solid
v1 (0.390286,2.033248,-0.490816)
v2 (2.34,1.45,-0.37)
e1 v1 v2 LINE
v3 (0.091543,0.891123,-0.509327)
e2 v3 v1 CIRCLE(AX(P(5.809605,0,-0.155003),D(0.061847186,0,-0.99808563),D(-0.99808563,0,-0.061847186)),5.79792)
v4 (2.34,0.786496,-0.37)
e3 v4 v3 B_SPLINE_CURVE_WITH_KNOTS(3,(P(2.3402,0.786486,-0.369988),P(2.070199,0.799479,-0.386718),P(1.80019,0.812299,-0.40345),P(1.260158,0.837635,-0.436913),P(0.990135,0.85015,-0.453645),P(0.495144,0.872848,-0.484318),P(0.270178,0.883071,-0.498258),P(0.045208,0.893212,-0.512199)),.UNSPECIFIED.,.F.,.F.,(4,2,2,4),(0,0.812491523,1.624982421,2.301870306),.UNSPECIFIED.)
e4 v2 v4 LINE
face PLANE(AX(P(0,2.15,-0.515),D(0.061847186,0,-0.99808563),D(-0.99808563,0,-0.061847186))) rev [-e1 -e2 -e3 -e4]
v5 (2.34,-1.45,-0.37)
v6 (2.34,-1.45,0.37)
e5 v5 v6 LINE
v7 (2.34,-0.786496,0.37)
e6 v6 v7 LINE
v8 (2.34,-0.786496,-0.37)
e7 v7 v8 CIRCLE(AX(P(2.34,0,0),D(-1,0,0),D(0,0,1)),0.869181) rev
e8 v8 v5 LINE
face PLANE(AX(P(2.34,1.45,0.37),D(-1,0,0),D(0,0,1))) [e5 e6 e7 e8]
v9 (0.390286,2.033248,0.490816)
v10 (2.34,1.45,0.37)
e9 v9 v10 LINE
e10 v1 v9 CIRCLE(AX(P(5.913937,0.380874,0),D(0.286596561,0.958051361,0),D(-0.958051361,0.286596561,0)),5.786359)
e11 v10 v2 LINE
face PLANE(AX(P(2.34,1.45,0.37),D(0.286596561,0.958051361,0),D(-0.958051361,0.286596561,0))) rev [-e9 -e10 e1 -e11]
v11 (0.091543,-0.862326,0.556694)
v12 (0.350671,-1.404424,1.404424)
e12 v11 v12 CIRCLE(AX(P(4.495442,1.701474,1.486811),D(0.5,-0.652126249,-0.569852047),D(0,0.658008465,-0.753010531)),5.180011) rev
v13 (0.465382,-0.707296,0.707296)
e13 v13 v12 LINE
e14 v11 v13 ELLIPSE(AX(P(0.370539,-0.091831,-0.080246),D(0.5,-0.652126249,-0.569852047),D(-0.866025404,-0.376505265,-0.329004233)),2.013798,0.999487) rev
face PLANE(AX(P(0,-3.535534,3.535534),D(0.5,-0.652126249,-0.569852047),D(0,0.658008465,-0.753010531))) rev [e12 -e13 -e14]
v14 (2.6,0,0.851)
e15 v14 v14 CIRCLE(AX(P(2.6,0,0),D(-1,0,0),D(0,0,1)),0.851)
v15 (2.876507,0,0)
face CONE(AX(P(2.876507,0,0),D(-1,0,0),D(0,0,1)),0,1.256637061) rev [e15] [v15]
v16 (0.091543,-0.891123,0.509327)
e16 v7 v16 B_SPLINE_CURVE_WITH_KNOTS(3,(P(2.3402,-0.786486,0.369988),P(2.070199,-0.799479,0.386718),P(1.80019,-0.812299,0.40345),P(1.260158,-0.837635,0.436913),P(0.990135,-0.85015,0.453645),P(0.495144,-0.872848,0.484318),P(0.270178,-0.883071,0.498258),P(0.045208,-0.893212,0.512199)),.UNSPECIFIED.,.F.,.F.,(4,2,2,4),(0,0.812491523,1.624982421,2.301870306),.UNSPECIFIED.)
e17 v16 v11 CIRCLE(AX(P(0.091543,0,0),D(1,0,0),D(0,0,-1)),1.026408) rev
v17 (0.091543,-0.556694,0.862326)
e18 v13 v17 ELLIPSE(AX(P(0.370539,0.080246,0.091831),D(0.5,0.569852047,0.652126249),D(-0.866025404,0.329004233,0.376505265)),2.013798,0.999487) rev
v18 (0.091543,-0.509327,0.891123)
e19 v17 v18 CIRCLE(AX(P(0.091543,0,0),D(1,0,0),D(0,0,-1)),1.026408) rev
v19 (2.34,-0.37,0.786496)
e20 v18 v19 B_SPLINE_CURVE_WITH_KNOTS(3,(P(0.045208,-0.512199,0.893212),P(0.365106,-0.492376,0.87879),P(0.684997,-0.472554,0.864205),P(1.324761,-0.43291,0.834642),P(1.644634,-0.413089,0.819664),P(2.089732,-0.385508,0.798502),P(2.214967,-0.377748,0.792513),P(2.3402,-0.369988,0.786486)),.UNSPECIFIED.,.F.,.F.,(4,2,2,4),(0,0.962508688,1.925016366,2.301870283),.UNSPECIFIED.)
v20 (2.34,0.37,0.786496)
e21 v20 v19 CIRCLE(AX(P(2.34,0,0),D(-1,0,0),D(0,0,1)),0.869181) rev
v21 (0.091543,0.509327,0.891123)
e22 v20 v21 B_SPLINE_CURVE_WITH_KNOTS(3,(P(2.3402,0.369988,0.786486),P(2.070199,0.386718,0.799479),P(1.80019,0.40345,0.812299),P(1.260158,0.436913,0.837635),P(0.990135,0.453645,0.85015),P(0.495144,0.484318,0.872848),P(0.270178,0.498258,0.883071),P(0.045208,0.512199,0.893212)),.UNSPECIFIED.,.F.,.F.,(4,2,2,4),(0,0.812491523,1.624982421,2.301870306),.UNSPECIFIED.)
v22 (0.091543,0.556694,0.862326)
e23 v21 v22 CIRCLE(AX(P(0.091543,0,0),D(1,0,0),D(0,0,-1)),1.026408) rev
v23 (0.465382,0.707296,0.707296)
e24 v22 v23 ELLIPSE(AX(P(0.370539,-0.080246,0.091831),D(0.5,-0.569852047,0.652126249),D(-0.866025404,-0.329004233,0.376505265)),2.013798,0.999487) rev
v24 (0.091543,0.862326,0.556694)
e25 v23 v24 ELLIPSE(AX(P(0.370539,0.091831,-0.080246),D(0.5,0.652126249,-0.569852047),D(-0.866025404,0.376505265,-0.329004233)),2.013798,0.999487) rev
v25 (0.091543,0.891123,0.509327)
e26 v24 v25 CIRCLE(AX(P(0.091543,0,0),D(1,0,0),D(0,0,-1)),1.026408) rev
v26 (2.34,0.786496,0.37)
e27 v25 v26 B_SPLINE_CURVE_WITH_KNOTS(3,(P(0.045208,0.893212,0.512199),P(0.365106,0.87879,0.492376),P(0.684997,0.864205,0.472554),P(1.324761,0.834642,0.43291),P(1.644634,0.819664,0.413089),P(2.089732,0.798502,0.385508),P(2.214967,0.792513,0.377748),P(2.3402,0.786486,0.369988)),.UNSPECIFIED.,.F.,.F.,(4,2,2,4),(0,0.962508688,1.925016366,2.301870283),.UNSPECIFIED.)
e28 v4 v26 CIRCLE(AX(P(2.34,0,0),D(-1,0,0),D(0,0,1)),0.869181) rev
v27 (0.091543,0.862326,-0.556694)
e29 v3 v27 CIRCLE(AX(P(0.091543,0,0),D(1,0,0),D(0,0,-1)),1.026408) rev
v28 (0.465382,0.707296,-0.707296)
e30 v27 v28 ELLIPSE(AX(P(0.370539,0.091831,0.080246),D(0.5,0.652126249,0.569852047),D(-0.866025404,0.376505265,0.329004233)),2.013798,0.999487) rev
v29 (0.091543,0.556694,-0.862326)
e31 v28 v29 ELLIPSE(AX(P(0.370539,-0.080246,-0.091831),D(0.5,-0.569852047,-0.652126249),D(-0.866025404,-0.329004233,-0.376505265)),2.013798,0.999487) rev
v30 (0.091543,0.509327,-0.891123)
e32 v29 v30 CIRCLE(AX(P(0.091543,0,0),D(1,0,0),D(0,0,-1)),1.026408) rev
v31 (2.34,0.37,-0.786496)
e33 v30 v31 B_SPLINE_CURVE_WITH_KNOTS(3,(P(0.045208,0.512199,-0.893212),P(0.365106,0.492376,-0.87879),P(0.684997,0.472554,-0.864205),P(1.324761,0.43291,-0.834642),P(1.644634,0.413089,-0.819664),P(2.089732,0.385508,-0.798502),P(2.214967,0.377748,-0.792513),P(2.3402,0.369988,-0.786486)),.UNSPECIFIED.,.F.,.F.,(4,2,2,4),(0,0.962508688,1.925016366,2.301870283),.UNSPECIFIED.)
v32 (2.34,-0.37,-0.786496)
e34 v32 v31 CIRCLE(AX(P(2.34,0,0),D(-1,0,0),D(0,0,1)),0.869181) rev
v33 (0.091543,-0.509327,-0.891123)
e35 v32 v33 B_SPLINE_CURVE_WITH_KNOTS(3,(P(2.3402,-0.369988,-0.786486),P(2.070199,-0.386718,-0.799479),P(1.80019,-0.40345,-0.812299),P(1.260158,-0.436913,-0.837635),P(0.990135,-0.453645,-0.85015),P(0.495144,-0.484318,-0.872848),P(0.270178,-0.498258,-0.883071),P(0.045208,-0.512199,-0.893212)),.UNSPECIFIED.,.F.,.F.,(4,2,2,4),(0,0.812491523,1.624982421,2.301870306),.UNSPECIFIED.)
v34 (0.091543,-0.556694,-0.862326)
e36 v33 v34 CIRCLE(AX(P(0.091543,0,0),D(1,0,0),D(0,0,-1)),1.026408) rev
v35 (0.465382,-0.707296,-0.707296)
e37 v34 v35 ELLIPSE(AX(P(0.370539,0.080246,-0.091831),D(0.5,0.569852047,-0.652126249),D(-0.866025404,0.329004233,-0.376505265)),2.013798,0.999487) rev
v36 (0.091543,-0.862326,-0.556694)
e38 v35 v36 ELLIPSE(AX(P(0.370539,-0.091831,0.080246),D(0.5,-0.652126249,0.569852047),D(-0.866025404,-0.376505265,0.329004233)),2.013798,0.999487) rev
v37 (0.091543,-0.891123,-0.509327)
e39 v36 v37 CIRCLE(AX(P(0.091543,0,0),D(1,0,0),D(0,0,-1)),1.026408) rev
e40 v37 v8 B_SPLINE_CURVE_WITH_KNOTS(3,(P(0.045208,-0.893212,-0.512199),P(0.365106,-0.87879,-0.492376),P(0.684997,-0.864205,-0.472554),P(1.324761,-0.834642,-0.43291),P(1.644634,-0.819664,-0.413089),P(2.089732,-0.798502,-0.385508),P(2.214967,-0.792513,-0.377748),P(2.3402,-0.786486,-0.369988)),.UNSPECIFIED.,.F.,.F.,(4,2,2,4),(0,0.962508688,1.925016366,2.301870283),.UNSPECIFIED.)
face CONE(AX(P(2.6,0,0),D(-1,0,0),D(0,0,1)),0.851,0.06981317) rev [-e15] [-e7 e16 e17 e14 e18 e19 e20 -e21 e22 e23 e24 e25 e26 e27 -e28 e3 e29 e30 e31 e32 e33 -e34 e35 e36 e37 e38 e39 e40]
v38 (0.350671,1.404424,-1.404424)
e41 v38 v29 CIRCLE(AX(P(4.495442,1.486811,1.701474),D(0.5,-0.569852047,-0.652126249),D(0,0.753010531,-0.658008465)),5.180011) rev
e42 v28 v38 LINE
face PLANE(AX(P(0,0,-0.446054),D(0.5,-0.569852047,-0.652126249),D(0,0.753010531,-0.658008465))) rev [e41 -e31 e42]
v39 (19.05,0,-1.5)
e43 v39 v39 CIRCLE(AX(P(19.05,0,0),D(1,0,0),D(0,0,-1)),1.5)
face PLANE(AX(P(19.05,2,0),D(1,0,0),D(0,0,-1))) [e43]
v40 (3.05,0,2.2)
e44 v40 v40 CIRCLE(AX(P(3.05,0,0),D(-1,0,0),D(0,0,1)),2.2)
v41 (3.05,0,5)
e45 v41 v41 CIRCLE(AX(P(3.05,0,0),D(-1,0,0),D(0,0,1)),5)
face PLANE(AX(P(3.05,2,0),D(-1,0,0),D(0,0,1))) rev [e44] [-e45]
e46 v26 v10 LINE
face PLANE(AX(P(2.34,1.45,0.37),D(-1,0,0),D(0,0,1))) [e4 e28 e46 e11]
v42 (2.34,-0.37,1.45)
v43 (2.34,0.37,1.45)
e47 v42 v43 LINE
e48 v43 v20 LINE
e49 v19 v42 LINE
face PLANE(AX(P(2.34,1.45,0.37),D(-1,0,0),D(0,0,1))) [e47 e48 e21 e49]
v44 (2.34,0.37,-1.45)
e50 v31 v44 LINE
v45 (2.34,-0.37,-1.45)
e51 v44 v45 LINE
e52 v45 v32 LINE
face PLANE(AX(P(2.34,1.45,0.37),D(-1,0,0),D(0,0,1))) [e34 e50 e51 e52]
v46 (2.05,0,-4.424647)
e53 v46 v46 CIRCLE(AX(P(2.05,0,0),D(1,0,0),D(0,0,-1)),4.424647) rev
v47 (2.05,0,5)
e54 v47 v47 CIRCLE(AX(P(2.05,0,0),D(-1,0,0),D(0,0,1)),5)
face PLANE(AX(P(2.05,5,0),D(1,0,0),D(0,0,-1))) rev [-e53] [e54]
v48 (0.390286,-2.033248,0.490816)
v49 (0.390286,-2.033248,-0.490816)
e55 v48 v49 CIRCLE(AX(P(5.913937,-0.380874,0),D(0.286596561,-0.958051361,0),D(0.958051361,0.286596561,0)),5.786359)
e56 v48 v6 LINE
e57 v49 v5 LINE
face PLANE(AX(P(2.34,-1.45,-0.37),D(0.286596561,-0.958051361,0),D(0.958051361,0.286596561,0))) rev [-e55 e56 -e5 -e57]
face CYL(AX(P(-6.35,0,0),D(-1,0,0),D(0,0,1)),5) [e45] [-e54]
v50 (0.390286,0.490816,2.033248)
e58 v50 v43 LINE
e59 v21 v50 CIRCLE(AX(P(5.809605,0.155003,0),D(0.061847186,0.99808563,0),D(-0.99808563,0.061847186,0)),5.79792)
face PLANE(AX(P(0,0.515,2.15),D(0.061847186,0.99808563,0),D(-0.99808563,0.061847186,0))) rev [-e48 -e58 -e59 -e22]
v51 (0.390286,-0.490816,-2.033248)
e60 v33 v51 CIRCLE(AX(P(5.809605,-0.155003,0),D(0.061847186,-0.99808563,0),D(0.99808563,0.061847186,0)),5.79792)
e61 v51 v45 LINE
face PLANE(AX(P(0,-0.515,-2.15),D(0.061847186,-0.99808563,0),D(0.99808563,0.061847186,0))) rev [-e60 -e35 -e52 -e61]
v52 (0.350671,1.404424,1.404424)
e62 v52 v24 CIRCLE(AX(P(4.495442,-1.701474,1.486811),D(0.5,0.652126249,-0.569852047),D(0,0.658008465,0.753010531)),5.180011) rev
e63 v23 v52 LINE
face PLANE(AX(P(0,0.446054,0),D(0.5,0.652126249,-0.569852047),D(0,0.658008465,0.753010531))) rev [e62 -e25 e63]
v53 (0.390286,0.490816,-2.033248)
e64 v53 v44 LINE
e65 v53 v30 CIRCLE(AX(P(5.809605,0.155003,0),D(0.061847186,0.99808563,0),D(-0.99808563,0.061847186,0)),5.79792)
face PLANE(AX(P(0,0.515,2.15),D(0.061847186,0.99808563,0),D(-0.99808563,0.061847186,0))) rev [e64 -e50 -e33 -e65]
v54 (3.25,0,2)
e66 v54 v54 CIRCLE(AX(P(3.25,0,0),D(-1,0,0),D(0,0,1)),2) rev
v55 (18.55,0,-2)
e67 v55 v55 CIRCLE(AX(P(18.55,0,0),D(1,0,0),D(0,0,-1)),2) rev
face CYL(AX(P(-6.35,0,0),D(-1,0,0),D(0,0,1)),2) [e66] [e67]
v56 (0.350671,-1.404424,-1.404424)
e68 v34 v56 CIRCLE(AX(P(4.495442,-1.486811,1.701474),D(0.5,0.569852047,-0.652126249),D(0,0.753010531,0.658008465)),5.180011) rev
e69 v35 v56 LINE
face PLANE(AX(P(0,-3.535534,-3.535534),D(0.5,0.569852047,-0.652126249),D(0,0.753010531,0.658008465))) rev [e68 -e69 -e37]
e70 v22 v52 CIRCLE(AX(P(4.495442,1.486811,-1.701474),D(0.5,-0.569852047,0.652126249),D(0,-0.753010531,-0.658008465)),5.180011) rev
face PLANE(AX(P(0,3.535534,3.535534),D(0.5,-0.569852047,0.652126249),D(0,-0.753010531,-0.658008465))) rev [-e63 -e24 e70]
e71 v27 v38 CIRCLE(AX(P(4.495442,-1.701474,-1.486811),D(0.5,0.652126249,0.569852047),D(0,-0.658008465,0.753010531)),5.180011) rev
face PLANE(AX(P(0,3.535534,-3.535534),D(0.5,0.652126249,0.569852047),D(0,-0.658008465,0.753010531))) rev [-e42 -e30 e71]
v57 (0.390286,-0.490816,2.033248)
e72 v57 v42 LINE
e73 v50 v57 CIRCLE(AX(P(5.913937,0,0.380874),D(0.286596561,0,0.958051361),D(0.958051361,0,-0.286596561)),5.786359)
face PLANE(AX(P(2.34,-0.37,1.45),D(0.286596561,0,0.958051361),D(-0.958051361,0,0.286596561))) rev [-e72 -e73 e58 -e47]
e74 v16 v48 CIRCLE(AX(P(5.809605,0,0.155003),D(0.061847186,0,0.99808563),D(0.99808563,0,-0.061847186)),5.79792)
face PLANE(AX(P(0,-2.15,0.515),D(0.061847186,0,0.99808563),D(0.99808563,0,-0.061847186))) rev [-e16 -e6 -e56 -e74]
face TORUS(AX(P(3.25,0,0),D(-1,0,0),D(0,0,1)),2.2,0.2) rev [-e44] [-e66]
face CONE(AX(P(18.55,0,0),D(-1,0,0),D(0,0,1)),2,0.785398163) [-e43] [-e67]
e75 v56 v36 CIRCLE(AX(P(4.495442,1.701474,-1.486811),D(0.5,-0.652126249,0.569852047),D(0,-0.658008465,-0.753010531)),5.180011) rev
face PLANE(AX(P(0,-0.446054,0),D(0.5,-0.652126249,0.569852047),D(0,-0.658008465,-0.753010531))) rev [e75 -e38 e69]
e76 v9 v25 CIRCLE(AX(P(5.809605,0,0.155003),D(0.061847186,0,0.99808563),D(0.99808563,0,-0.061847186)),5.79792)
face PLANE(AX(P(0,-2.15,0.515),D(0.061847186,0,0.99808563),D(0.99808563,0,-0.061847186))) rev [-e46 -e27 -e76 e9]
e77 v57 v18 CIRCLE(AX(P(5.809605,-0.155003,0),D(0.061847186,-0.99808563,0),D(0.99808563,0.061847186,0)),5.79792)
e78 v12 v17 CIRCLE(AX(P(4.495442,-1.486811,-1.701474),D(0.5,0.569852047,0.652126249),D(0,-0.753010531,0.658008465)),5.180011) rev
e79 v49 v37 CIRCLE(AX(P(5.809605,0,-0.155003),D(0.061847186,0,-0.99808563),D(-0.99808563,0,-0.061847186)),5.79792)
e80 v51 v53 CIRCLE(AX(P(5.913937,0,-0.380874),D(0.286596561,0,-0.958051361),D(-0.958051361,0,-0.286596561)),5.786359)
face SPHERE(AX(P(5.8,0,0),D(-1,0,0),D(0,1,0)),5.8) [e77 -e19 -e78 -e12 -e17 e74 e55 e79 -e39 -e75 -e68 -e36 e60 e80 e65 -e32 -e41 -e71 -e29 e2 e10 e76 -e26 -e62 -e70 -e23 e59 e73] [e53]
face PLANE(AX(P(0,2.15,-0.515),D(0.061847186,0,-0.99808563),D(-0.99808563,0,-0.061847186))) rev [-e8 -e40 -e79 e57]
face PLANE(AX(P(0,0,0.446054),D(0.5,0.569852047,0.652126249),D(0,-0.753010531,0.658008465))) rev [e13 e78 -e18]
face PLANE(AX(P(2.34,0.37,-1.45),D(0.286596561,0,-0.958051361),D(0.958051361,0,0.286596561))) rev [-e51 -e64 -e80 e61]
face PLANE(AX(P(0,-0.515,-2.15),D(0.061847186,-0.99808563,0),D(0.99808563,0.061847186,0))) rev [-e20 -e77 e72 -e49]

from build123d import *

# Parameters (mm, degrees)
FILLET1_R             = 0.2
RECPAT_COUNT          = 2
RECPAT_ANGLE          = 90
CHAMFER_1_SIZE        = 0.5
CUT_EXTRUDE_START     = -1.932317225
CUT_EXTRUDE_1_DEPTH   = 0.992538955
CUT_EXTRUDE_1_2_DEPTH = 0.992538955
CUT_EXTRUDE_1_3_DEPTH = 0.992538955
CUT_EXTRUDE_1_4_DEPTH = 0.992538955


# Read off the part's stored shape, not the designer's step: Вытянуть1
with BuildPart() as part:
    # BodySke → Base-Revolve (revolve)
    with BuildSketch(Plane.XY, mode=Mode.PRIVATE) as base_revolve_sk:
        Polygon((3.05, 2), (3.05, 5), (2.05, 5), (2.05, 0), (19.05, 0), (19.05, 2), align=None)
    revolve(base_revolve_sk.sketch.rotate(Axis((-6.35, 0, 0), (1, 0, 0)), 90), axis=Axis((-6.35, 0, 0), (1, 0, 0)))

    # Fillet1
    fillet1_edges = [part.edges().sort_by_distance(p)[0] for p in [
        (3.05, 0, -2),
    ]]
    fillet(fillet1_edges, radius=FILLET1_R)

    # PanSke → Pan (revolve)
    with BuildSketch(Plane.XY):
        with BuildLine():
            Line((2.05, 4.424646879), (2.05, 0))
            Line((2.05, 0), (0, 0))
            ThreePointArc((0, 0), (0.537396082, 2.438237068), (2.05, 4.424646879))
        make_face()
    revolve(axis=Axis((0, 0, 0), (1, 0, 0)))

    # Sketch3 → Recess section 0
    with BuildSketch(Plane(origin=(0, 0, 0), x_dir=(0, 0, -1), z_dir=(1, 0, 0))):
        with BuildLine():
            Line((-0.515, 2.15), (0.515, 2.15))
            Line((0.515, 2.15), (0.515, -2.15))
            Line((0.515, -2.15), (-0.515, -2.15))
            Line((-0.515, -2.15), (-0.515, 2.15))
        make_face()
    # Sketch4 → Recess section 1
    with BuildSketch(Plane(origin=(2.34, 0, 0), x_dir=(0, 0, -1), z_dir=(1, 0, 0))):
        with BuildLine():
            Line((-0.37, 1.45), (0.37, 1.45))
            Line((0.37, 1.45), (0.37, -1.45))
            Line((0.37, -1.45), (-0.37, -1.45))
            Line((-0.37, -1.45), (-0.37, 1.45))
        make_face()
    recess = loft(mode=Mode.SUBTRACT)

    # RecPat: Recess ×2 about axis
    recpat_axis = Axis((0, 0, 0), (1, 0, 0))
    for i in range(1, RECPAT_COUNT):
        add(recess.rotate(recpat_axis, i * RECPAT_ANGLE / (RECPAT_COUNT - 1)), mode=Mode.SUBTRACT)

    # RecCorSke → RecessCore (revolve, cut)
    with BuildSketch(Plane.XY, mode=Mode.PRIVATE) as recesscore_sk:
        Polygon((0, 0), (0, 1.032809711), (2.6, 0.851), (2.876506661, 0), align=None)
    revolve(recesscore_sk.sketch.rotate(Axis((-3.175, 0, 0), (1, 0, 0)), 90), axis=Axis((-3.175, 0, 0), (1, 0, 0)), mode=Mode.SUBTRACT)

    # Фаска1
    chamfer_1_edges = [part.edges().sort_by_distance(p)[0] for p in [
        (19.05, 0, -2),
    ]]
    chamfer(chamfer_1_edges, length=CHAMFER_1_SIZE)

    # Вытянуть1 outline → Вытянуть1 (cut)
    with BuildSketch(Plane(origin=(0, 0, 0), x_dir=(0.9932989193126689, -0.08172287590474257, -0.08172287590474261), z_dir=(0.1155735994606204, 0.7023684015912574, 0.7023684015912578)).offset(CUT_EXTRUDE_START)):
        Polygon((-1, -0.919204654), (0.206895578, -0.216114133), (0.577867997, 0), (0.206895578, 0.216114133), (-1, 0.919204654), align=None)
    extrude(amount=CUT_EXTRUDE_1_DEPTH, mode=Mode.SUBTRACT)

    # Cut-Extrude 1 2 outline → Cut-Extrude 1 2 (cut)
    with BuildSketch(Plane(origin=(0, 0, 0), x_dir=(0.9932989193126689, -0.08172287590474257, 0.08172287590474261), z_dir=(0.1155735994606204, 0.7023684015912574, -0.7023684015912578)).offset(CUT_EXTRUDE_START)):
        Polygon((0.206895578, -0.216114133), (0.577867997, 0), (0.206895578, 0.216114133), (-1, 0.919204654), (-1, -0.919204654), align=None)
    extrude(amount=CUT_EXTRUDE_1_2_DEPTH, mode=Mode.SUBTRACT)

    # Cut-Extrude 1 3 outline → Cut-Extrude 1 3 (cut)
    with BuildSketch(Plane(origin=(0, 0, 0), x_dir=(0.9932989193126689, 0.08172287590474257, 0.08172287590474261), z_dir=(0.1155735994606204, -0.7023684015912574, -0.7023684015912578)).offset(CUT_EXTRUDE_START)):
        Polygon((0.206895578, -0.216114133), (0.577867997, 0), (0.206895578, 0.216114133), (-1, 0.919204654), (-1, -0.919204654), align=None)
    extrude(amount=CUT_EXTRUDE_1_3_DEPTH, mode=Mode.SUBTRACT)

    # Cut-Extrude 1 4 outline → Cut-Extrude 1 4 (cut)
    with BuildSketch(Plane(origin=(0, 0, 0), x_dir=(0.9932989193126689, 0.08172287590474257, -0.08172287590474261), z_dir=(0.1155735994606204, -0.7023684015912574, 0.7023684015912578)).offset(CUT_EXTRUDE_START)):
        Polygon((-1, -0.919204654), (0.206895578, -0.216114133), (0.577867997, 0), (0.206895578, 0.216114133), (-1, 0.919204654), align=None)
    extrude(amount=CUT_EXTRUDE_1_4_DEPTH, mode=Mode.SUBTRACT)


solid = part.part
